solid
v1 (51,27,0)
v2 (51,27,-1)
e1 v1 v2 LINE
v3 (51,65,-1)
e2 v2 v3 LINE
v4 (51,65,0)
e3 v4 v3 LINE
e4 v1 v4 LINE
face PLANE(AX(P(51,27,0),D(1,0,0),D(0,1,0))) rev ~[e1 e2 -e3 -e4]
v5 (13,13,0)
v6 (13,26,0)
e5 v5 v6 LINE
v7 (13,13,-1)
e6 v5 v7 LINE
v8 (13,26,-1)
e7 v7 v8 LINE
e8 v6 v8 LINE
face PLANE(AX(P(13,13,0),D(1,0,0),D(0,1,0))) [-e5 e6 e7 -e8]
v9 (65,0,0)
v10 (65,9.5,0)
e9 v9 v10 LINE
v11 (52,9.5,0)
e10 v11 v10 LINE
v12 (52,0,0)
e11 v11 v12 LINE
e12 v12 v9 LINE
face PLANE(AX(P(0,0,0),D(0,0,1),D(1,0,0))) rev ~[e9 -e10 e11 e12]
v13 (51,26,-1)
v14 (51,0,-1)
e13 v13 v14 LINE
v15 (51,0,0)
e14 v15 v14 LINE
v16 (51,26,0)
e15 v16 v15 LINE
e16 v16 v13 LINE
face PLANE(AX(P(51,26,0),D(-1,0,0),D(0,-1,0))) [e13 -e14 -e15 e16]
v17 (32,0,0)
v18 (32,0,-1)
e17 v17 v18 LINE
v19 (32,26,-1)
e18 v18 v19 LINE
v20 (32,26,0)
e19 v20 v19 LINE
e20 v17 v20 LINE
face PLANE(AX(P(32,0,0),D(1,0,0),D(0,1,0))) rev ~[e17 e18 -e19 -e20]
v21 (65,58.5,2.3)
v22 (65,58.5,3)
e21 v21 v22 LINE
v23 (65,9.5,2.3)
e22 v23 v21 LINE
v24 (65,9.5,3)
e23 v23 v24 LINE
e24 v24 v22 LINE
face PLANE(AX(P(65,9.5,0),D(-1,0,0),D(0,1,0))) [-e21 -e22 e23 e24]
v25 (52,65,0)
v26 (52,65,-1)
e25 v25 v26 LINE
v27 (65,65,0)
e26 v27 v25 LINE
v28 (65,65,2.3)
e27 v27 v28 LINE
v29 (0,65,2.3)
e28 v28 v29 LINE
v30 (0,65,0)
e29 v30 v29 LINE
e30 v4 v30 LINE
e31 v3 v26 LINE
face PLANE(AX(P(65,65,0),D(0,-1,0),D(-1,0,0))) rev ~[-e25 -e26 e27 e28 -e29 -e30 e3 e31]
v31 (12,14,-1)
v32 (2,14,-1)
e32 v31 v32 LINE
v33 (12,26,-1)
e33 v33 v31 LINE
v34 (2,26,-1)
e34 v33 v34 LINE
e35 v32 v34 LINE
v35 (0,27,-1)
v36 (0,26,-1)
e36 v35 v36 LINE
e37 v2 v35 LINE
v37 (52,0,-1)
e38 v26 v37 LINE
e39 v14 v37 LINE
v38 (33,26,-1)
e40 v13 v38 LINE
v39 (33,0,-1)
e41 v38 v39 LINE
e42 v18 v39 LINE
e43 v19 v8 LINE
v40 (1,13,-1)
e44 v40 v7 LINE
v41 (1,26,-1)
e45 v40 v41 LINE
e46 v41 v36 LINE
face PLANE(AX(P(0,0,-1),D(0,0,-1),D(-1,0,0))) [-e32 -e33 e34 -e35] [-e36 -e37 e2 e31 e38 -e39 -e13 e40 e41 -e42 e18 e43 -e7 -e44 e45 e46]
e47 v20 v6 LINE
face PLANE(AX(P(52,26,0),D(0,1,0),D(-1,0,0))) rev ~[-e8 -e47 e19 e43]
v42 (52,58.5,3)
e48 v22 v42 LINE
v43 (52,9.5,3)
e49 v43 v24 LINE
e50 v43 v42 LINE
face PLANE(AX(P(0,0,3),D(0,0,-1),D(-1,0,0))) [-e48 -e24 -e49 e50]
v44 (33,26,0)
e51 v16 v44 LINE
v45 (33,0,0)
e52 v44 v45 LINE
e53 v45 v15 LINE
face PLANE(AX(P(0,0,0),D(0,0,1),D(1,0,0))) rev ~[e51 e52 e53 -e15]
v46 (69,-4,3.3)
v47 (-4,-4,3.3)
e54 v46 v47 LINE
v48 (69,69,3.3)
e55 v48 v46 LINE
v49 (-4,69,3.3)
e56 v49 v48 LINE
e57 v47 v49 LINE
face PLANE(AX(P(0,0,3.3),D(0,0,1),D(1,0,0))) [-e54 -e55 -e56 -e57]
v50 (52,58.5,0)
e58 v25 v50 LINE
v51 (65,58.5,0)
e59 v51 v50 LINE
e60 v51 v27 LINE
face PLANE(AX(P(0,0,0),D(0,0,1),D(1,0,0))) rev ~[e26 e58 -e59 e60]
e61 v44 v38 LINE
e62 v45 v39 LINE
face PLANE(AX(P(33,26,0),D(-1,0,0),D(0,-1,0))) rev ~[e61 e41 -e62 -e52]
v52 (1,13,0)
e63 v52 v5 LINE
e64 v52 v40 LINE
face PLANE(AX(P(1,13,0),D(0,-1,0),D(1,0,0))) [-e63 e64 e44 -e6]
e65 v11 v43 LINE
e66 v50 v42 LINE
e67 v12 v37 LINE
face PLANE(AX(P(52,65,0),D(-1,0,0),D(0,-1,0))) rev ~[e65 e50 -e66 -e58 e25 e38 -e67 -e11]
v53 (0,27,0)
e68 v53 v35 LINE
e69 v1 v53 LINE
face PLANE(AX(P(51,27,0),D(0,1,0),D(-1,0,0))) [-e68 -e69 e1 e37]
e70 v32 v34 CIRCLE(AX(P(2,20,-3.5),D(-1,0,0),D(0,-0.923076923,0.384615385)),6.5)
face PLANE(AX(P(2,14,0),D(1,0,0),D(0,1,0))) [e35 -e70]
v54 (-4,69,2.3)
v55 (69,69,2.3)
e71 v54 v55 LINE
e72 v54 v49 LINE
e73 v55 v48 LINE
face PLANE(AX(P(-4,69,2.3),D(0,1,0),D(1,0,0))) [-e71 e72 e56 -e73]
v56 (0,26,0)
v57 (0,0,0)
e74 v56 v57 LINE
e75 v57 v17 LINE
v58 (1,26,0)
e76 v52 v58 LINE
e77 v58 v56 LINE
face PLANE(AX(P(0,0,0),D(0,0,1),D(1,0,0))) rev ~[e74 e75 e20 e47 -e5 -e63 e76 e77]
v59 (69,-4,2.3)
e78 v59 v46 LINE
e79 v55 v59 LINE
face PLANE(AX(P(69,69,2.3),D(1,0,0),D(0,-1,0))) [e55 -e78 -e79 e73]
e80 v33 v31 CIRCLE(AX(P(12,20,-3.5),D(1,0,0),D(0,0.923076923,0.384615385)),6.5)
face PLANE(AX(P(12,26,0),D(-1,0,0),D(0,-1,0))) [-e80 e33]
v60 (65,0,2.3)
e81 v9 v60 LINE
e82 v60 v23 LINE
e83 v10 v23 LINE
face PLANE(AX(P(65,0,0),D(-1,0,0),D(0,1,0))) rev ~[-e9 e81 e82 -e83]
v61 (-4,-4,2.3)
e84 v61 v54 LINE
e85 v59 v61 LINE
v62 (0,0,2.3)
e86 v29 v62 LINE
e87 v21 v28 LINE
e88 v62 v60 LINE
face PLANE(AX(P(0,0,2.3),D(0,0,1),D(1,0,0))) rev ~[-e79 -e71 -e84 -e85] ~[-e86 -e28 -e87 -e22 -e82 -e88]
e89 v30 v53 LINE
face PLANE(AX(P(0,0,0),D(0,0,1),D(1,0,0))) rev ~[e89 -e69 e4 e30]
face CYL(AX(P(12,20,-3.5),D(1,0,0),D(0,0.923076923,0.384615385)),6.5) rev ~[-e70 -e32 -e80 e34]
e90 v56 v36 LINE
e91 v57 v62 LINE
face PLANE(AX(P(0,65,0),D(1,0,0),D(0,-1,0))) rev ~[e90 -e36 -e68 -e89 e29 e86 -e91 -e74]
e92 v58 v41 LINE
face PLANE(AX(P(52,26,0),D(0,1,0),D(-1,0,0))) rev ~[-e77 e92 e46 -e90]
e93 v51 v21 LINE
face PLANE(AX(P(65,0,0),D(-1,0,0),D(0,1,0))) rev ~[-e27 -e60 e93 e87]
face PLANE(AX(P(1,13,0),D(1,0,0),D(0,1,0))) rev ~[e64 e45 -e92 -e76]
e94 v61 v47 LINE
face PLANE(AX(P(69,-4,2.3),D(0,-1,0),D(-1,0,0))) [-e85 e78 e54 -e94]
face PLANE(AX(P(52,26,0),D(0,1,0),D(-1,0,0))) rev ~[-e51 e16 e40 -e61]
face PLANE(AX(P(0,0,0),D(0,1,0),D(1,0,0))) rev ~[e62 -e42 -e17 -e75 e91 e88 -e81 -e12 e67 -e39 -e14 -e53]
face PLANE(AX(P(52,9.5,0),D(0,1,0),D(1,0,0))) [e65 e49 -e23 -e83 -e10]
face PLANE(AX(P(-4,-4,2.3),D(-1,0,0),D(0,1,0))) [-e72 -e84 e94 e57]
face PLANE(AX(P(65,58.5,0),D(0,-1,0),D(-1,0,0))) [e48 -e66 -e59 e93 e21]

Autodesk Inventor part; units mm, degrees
ref_plane "YZ Plane" through (0, 0, 0) normal (1, 0, 0) x (0, 1, 0)
ref_plane "XZ Plane" through (0, 0, 0) normal (0, 1, 0) x (-1, 0, 0)
ref_plane "XY Plane" through (0, 0, 0) normal (0, 0, 1) x (1, 0, 0)
sketch "Sketch1" plane through (0, 0, 0) normal (0, 0, 1) x (1, 0, 0)
  line L0 (0, 0) -> (65, 0)
  line L1 (65, 0) -> (65, 65)
  line L2 (65, 65) -> (0, 65)
  line L3 (0, 65) -> (0, 0)
  dimension "d0" = 65
  dimension "d1" = 65
extrude "Extrusion1" add sketch "Sketch1" along normal blind 2.3
sketch "Sketch2" plane through (0, 0, 2.3) normal (0, 0, 1) x (1, 0, 0)
  line L0 (-4, 69) -> (69, 69)
  line L1 (69, 69) -> (69, -4)
  line L2 (69, -4) -> (-4, -4)
  line L3 (-4, -4) -> (-4, 69)
  point P0 (0, 0)
  point P1 (0, 65)
  point P2 (65, 0)
extrude "Extrusion2" add sketch "Sketch2" along normal blind 1
sketch "Sketch3" plane through (0, 0, 0) normal (0, 0, -1) x (-1, 0, 0)
  line L0 (0, 0) -> (-65, 0) projected
  line L1 (0, 65) -> (0, 0) projected
  line L2 (-65, 0) -> (-65, 65) projected
  line L3 (-52, 65) -> (-52, 26)
  line L4 (-52, 26) -> (0, 26)
  line L5 (-51, 27) -> (-51, 65)
  line L6 (-51, 65) -> (-52, 65)
  line L7 (0, 65) -> (-1, 65)
  line L8 (-51, 27) -> (0, 27)
  point P0 (0, 26)
extrude "Extrusion5" add sketch "Sketch3" along normal blind 1
sketch "Sketch6" plane through (0, 0, 0) normal (0, 0, -1) x (-1, 0, 0)
  line L0 (-65, 65) -> (-52, 65) projected
  line L1 (-65, 55.5) -> (-52, 55.5)
  line L2 (-52, 26) -> (-52, 65) projected
  line L3 (-52, 55.5) -> (-52, 9.5)
  line L4 (-52, 9.5) -> (-65, 9.5)
  line L5 (-65, 9.5) -> (-65, 55.5)
  line L6 (-65, 0) -> (-65, 65) projected
  point P0 (0, 0)
  dimension "d23" = 46
extrude "Extrusion6" cut sketch "Sketch6" against normal blind 3 contours L1 L2 L3 L4 L5
sketch "Sketch7" plane through (0, 0, 0) normal (0, 0, -1) x (-1, 0, 0)
  line L0 (-65, 9.5) -> (-65, 55.5) projected
  line L1 (-52, 55.5) -> (-52, 65) projected
  line L2 (-52, 55.5) -> (-65, 55.5)
  line L3 (-65, 55.5) -> (-65, 58.5)
  line L4 (-65, 58.5) -> (-52, 58.5)
  line L5 (-52, 58.5) -> (-52, 55.5)
  point P0 (0, 0)
extrude "Extrusion7" cut sketch "Sketch7" against normal blind 3
sketch "Sketch8" plane through (0, 0, 0) normal (0, 0, -1) x (-1, 0, 0)
  line L0 (-52, 26) -> (-52, 9.5) projected
  line L1 (-52, 26) -> (-52, 0)
  line L2 (-52, 26) -> (-51, 26)
  line L3 (-51, 26) -> (-51, 0)
  line L4 (0, 0) -> (-65, 0) projected
  line L5 (-52, 0) -> (-51, 0)
  line L6 (-51, 26) -> (-33, 26)
  line L7 (0, 26) -> (-52, 26) projected
  line L8 (-33, 26) -> (-33, 0)
  line L9 (-33, 0) -> (-32, 0)
  line L10 (-32, 0) -> (-32, 26)
  line L11 (-32, 26) -> (-33, 26)
  dimension "d32" = 1
extrude "Extrusion8" add sketch "Sketch8" along normal blind 1 contours L2 L3 L4 L1 L0 | L7 L10 L4 L8
sketch "Sketch9" plane through (0, 0, 0) normal (0, 0, -1) x (-1, 0, 0)
  line L0 (0, 26) -> (0, 0) projected
  line L1 (0, 26) -> (-32, 26) projected
  line L2 (-2, 26) -> (-12, 26)
  line L3 (-12, 26) -> (-12, 14)
  line L4 (-12, 14) -> (-2, 14)
  line L5 (-2, 14) -> (-2, 26)
  line L6 (-1, 13) -> (-13, 13)
  line L7 (-13, 13) -> (-13, 26)
  line L8 (-1, 13) -> (-1, 26)
  line L9 (-12, 26) -> (-13, 26)
  line L10 (-2, 26) -> (-1, 26)
  dimension "d35" = 2
  dimension "d36" = 10
  dimension "d37" = 12
extrude "Extrusion9" add sketch "Sketch9" along normal blind 1 contours L8 L6 L7 L1 L3 L4 L5
sketch "Sketch12" plane through (0, 0, 0) normal (0, 0, -1) x (-1, 0, 0)
  line L0 (-12, 14) -> (-2, 14) projected
  line L1 (-12, 26) -> (-2, 26) projected
  line L2 (-12, 14) -> (-2, 14)
  line L3 (-2, 14) -> (-2, 26)
  line L4 (-2, 26) -> (-12, 26)
  line L5 (-12, 26) -> (-12, 14)
  point P0 (0, 0)
extrude "Extrusion11" cut sketch "Sketch12" against normal blind 3
fillet "Fillet1" radius 6.5 2 edges at (7, 14, 3) (7, 26, 3)
properties part number "CaseBottom"
